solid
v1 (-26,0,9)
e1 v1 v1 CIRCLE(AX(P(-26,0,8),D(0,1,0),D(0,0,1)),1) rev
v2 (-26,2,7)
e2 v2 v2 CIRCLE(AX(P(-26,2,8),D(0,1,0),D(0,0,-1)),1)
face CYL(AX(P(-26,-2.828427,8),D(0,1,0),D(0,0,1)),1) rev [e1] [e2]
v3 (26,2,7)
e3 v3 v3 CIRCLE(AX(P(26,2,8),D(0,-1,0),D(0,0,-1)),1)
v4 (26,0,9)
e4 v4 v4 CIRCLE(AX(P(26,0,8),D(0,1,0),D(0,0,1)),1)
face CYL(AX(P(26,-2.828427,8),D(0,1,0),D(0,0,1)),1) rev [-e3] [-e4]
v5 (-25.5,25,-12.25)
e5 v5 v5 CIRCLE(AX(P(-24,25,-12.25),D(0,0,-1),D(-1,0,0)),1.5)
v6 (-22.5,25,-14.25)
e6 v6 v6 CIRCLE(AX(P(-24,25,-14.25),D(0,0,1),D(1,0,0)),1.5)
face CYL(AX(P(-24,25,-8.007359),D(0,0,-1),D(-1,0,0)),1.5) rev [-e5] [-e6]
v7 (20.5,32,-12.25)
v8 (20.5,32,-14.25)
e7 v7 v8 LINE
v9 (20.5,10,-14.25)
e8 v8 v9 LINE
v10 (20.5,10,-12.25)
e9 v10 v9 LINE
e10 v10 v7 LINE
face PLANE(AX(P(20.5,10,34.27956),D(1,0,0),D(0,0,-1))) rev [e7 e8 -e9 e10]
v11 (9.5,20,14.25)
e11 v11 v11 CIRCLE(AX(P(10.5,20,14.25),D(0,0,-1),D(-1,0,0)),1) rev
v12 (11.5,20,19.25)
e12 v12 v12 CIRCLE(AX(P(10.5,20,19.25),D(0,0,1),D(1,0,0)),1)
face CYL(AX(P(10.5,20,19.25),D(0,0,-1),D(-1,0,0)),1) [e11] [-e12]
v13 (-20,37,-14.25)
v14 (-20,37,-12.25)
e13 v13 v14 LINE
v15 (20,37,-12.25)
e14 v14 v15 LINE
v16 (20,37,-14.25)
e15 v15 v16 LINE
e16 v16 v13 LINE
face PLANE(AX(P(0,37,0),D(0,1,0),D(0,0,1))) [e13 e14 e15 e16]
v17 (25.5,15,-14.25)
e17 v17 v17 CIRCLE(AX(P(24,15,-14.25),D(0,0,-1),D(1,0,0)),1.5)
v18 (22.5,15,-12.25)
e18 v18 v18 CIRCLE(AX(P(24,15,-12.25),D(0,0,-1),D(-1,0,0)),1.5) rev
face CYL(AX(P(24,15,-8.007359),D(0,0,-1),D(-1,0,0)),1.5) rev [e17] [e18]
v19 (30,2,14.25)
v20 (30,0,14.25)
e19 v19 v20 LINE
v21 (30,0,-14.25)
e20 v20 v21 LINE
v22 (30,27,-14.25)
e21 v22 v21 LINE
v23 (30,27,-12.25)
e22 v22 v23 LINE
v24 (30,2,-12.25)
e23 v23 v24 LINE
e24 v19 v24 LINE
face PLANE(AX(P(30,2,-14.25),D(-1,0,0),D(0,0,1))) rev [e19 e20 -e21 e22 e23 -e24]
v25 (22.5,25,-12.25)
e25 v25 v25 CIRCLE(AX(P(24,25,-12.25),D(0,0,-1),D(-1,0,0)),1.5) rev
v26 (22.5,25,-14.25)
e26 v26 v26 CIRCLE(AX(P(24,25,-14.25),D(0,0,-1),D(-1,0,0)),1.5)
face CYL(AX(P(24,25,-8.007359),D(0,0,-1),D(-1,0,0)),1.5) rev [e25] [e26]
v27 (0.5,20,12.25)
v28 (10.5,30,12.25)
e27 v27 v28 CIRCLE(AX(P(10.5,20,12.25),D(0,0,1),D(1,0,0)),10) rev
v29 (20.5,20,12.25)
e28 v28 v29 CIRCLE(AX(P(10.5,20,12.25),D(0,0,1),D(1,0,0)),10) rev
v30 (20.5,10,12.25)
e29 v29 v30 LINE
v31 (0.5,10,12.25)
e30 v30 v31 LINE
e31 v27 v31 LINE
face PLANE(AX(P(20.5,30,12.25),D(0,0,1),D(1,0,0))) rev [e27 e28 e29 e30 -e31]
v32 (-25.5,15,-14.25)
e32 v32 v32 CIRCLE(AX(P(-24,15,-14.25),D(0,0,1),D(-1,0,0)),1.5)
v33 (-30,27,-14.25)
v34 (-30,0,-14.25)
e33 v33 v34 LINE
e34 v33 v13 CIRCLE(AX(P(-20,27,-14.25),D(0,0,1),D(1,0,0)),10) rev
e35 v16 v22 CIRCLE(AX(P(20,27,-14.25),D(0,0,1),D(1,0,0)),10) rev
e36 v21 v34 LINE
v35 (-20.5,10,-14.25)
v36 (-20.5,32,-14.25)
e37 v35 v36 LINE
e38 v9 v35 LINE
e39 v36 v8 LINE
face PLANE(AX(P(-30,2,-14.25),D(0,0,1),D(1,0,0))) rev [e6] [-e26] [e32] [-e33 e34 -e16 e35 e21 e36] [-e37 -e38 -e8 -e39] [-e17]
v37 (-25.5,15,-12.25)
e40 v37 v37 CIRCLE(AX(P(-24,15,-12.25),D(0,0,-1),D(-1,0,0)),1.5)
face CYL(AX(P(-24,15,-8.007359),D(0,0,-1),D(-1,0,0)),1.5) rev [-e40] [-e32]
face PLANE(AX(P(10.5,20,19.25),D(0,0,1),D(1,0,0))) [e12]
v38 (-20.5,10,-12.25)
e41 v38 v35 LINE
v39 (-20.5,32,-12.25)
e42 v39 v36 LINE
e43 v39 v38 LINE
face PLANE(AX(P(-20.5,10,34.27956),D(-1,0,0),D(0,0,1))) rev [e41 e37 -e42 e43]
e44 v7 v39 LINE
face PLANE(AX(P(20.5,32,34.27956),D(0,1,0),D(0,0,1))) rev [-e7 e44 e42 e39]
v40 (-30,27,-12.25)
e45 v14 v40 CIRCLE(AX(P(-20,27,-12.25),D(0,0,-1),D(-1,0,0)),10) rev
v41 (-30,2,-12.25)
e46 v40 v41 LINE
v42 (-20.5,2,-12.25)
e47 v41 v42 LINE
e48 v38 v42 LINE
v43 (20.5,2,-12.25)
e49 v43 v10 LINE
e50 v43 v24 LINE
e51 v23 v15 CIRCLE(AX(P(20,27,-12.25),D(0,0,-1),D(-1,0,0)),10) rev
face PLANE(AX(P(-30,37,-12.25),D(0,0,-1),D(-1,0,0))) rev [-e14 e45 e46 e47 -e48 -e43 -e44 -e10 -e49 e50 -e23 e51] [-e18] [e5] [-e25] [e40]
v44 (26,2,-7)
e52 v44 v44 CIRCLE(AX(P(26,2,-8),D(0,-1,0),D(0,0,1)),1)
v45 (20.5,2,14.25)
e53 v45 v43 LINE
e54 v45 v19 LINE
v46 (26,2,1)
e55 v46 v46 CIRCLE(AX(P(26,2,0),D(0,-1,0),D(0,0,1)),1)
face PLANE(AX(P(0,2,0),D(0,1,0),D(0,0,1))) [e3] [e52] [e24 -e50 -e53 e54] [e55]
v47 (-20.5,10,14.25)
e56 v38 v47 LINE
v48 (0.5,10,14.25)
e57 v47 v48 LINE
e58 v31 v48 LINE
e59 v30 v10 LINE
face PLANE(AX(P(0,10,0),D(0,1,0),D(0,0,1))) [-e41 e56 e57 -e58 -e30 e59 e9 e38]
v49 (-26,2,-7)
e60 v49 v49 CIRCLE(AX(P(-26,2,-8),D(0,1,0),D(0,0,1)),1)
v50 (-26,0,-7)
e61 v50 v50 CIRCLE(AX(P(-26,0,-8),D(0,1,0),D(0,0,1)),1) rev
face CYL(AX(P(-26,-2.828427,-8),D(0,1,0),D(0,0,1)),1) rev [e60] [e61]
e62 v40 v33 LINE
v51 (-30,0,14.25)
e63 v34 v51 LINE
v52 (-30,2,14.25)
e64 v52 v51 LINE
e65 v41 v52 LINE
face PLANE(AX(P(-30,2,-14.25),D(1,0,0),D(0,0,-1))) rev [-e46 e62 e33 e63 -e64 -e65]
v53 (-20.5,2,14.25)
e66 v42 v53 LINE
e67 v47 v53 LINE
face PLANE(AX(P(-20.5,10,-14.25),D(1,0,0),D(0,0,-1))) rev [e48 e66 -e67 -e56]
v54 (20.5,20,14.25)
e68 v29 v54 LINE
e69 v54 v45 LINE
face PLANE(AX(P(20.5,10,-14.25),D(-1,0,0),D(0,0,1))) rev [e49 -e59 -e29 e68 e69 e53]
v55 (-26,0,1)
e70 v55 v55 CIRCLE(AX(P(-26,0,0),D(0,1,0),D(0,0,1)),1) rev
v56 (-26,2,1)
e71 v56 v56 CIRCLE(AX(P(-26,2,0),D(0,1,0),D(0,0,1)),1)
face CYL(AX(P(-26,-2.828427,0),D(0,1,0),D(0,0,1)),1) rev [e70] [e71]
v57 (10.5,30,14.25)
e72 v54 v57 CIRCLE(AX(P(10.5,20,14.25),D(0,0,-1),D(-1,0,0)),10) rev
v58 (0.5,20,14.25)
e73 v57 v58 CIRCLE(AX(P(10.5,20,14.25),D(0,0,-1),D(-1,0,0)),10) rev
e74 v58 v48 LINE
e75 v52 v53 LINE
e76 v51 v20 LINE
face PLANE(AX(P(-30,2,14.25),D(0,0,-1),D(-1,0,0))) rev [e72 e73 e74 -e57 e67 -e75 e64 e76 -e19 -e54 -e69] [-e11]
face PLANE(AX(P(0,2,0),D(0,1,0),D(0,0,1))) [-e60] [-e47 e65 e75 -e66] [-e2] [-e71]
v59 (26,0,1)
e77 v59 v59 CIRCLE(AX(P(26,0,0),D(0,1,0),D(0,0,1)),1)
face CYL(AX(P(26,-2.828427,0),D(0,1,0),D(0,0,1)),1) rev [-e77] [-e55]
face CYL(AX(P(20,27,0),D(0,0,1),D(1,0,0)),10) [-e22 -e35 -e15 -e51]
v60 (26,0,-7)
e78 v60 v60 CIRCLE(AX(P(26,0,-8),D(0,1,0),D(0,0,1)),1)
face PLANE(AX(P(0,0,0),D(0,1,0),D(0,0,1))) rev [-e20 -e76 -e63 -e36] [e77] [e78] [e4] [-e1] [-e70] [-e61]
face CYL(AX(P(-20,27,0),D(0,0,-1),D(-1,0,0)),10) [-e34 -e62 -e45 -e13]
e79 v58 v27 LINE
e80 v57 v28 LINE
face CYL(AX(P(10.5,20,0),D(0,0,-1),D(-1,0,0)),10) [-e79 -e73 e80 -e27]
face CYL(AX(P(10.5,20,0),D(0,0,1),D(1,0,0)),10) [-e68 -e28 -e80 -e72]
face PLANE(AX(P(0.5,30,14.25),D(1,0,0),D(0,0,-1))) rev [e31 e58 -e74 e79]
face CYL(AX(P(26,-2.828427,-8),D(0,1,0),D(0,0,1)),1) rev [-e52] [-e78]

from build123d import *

# Parameters (mm, degrees)
SKETCH1_W           = 60
SKETCH1_H           = 28.5
BOSS_EXTRUDE1_DEPTH = 2
SKETCH2_W           = 60
SKETCH2_H           = 2
BOSS_EXTRUDE2_DEPTH = 35
SKETCH3_W           = 41
SKETCH3_H           = 28.5
BOSS_EXTRUDE3_DEPTH = 8
SKETCH4_W           = 20
SKETCH4_H           = 2
BOSS_EXTRUDE4_DEPTH = 20
SKETCH5_W           = 41
SKETCH5_H           = 22
CUT_EXTRUDE1_DEPTH  = 2
SKETCH6_R           = 1.5
CUT_EXTRUDE2_DEPTH  = 2
SKETCH7_R           = 1
BOSS_EXTRUDE5_DEPTH = 5
FILLET1_R           = 10
FILLET2_R           = 10
SKETCH8_R           = 1
CUT_EXTRUDE3_DEPTH  = 2


with BuildPart() as part:
    # Sketch1 → Boss-Extrude1 (new body)
    with BuildSketch(Plane(origin=(0, 0, 0), x_dir=(1, 0, 0), z_dir=(0, 1, 0))):
        Rectangle(SKETCH1_W, SKETCH1_H)
    extrude(amount=BOSS_EXTRUDE1_DEPTH)

    # Sketch2 → Boss-Extrude2 (add)
    with BuildSketch(Plane(origin=(0, 2, 0), x_dir=(1, 0, 0), z_dir=(0, 1, 0))):
        with Locations((0, 13.25)):
            Rectangle(SKETCH2_W, SKETCH2_H)
    extrude(amount=BOSS_EXTRUDE2_DEPTH)

    # Sketch3 → Boss-Extrude3 (add)
    with BuildSketch(Plane(origin=(0, 2, 0), x_dir=(1, 0, 0), z_dir=(0, 1, 0))):
        Rectangle(SKETCH3_W, SKETCH3_H)
    extrude(amount=BOSS_EXTRUDE3_DEPTH)

    # Sketch4 → Boss-Extrude4 (add)
    with BuildSketch(Plane(origin=(0, 10, 0), x_dir=(1, 0, 0), z_dir=(0, 1, 0))):
        with Locations((10.5, -13.25)):
            Rectangle(SKETCH4_W, SKETCH4_H)
    extrude(amount=BOSS_EXTRUDE4_DEPTH)

    # Sketch5 → Cut-Extrude1 (cut)
    with BuildSketch(Plane(origin=(0, 0, -14.25), x_dir=(-1, 0, 0), z_dir=(0, 0, -1))):
        with Locations((0, 21)):
            Rectangle(SKETCH5_W, SKETCH5_H)
    extrude(amount=-CUT_EXTRUDE1_DEPTH, mode=Mode.SUBTRACT)

    # Sketch6 → Cut-Extrude2 (cut)
    with BuildSketch(Plane(origin=(0, 0, -14.25), x_dir=(-1, 0, 0), z_dir=(0, 0, -1))):
        with Locations((-24, 25)):
            Circle(SKETCH6_R)
        with Locations((-24, 15)):
            Circle(SKETCH6_R)
    cut_extrude2 = extrude(amount=-CUT_EXTRUDE2_DEPTH, mode=Mode.SUBTRACT)

    # Mirror1: Cut-Extrude2 across plane
    add(cut_extrude2.mirror(Plane(origin=(0, 0, 0), x_dir=(0, 0, 1), z_dir=(1, 0, 0))), mode=Mode.SUBTRACT)

    # Sketch7 → Boss-Extrude5 (add)
    with BuildSketch(Plane.XY.offset(14.25)):
        with Locations(Location((10.5, 20, 0), (0, 0, 180))):
            Circle(SKETCH7_R)
    extrude(amount=BOSS_EXTRUDE5_DEPTH)

    # Fillet1
    fillet1_edges = [part.edges().sort_by_distance(p)[0] for p in [
        (0.5, 30, 13.25),
        (20.5, 30, 13.25),
    ]]
    fillet(fillet1_edges, radius=FILLET1_R - 0.0001)  # a hair under: the kernel refuses the full size

    # Fillet2
    fillet2_edges = [part.edges().sort_by_distance(p)[0] for p in [
        (-30, 37, -13.25),
        (30, 37, -13.25),
    ]]
    fillet(fillet2_edges, radius=FILLET2_R)

    # Sketch8 → Cut-Extrude3 (cut)
    with BuildSketch(Plane(origin=(0, 2, 0), x_dir=(1, 0, 0), z_dir=(0, 1, 0))):
        with Locations(Location((-26, 0, 0), (0, 0, 270))):
            Circle(SKETCH8_R)
        with Locations(Location((-26, 8, 0), (0, 0, 270))):
            Circle(SKETCH8_R)
        with Locations(Location((-26, -8, 0), (0, 0, 270))):
            Circle(SKETCH8_R)
    cut_extrude3 = extrude(amount=-CUT_EXTRUDE3_DEPTH, mode=Mode.SUBTRACT)

    # Mirror2: Cut-Extrude3 across plane
    add(cut_extrude3.mirror(Plane(origin=(0, 0, 0), x_dir=(0, 0, 1), z_dir=(1, 0, 0))), mode=Mode.SUBTRACT)


solid = part.part
